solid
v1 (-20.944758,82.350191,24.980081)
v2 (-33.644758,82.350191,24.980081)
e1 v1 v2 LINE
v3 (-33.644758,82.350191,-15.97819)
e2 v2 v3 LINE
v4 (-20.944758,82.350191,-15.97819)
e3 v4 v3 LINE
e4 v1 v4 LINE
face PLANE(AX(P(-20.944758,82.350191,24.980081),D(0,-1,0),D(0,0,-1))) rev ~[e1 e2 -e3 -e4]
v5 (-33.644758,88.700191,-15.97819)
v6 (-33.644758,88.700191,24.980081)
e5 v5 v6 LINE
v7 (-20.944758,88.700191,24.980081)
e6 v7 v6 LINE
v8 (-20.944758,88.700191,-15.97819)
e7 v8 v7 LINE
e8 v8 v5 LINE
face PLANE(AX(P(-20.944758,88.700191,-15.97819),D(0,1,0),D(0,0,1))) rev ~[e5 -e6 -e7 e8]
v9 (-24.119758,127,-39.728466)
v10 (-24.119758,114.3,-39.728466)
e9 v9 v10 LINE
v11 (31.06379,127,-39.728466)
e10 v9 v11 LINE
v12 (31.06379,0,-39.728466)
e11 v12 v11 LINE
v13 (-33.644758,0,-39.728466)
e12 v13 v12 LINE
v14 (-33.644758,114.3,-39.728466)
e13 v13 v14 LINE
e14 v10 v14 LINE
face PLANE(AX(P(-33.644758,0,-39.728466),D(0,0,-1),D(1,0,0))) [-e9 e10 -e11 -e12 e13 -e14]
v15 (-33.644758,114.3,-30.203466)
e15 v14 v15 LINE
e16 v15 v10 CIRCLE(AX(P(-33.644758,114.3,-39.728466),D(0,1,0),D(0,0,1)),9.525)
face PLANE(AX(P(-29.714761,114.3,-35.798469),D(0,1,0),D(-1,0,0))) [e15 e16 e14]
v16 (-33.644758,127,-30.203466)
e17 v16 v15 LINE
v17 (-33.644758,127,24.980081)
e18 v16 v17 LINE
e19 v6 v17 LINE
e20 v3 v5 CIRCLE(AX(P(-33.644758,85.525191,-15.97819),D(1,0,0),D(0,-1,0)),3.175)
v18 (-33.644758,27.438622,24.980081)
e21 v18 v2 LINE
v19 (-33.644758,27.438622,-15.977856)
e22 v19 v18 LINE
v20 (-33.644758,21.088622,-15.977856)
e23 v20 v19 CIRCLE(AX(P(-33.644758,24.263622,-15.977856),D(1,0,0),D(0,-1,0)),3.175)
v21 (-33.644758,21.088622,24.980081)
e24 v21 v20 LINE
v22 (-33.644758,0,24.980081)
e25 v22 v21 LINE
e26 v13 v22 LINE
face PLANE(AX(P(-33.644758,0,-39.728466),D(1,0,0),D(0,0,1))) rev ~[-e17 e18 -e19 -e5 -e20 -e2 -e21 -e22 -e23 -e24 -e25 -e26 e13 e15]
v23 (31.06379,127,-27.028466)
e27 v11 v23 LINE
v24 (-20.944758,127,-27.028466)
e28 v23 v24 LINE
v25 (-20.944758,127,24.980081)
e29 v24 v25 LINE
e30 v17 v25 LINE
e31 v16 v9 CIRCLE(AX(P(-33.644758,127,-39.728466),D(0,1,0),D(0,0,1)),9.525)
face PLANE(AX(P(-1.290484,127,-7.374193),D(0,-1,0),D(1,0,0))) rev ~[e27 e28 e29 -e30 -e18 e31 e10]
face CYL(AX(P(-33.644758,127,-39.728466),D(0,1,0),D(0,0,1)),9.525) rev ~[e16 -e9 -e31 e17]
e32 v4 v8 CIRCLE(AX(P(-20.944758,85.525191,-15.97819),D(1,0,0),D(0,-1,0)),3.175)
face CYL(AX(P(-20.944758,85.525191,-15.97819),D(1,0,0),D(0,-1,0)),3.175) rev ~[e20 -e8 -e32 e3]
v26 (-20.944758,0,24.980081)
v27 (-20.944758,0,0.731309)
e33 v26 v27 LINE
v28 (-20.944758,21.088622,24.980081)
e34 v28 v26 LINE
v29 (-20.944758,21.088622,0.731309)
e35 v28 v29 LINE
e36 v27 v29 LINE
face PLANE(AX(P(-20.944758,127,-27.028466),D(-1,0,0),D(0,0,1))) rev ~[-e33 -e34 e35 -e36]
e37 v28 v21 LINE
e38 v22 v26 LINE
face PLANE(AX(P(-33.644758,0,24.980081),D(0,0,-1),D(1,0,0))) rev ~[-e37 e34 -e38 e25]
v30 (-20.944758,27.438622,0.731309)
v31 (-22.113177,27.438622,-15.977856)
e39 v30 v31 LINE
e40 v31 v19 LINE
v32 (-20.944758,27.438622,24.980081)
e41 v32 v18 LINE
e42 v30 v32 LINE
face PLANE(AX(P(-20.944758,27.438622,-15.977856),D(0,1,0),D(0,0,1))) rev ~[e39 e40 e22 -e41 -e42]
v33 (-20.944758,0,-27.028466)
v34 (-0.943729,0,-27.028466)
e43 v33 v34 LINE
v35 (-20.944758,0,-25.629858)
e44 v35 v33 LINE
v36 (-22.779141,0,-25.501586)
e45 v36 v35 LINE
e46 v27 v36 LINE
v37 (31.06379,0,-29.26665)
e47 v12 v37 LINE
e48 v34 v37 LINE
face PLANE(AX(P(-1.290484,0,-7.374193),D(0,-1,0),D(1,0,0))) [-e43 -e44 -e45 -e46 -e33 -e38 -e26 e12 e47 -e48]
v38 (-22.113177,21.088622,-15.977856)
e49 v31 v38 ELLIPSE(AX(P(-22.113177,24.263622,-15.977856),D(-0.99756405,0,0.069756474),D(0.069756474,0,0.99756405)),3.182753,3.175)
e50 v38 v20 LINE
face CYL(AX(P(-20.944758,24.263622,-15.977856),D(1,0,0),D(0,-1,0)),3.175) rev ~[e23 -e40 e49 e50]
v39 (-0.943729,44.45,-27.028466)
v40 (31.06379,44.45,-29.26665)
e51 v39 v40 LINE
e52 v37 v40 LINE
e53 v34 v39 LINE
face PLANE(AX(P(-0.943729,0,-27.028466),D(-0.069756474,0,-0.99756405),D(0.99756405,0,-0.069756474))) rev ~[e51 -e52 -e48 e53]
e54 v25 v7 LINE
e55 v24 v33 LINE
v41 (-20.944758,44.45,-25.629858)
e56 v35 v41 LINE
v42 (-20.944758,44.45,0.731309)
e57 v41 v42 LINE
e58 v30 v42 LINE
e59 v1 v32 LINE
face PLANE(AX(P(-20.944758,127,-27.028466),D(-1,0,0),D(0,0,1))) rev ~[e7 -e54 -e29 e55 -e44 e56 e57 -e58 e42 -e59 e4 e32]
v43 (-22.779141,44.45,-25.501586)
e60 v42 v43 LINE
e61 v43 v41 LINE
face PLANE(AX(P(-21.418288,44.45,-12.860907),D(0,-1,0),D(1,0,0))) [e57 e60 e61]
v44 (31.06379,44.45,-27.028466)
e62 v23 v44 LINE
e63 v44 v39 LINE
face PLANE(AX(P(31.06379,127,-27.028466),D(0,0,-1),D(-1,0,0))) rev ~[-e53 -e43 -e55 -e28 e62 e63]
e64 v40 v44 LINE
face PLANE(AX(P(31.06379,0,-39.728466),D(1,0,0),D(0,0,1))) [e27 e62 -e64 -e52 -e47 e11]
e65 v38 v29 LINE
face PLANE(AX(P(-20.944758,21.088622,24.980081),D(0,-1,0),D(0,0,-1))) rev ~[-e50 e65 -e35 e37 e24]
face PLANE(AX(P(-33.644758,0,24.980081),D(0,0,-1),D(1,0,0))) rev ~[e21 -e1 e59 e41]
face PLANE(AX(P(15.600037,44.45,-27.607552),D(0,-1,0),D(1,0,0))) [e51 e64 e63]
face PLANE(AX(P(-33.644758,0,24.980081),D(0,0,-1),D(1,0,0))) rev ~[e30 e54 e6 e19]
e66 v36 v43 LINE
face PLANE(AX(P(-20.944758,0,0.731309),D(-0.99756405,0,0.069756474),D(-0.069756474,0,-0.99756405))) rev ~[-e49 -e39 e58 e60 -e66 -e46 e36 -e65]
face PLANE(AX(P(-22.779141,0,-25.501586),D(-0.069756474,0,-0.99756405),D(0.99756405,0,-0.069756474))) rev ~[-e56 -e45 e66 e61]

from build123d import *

# Parameters (mm, degrees)
F0_W     = 64.7085476667
F0_H     = 64.7085476667
F1_DEPTH = 127
F2_W     = 52.0085476667
F2_H     = 52.0085476667
F3_DEPTH = 127.001
F5_DEPTH = 44.45
F6_W     = 6.35
F6_H     = 24.2487721393
F7_DEPTH = 12.701
F9_DEPTH = 12.7


# Not quite as in the source:
# - a feature names something its author has since deleted; it is built from what else it names


with BuildPart() as f1:
    # F0 (on Front) → F1 (new body)
    with BuildSketch(Plane.XZ):
        with Locations((-1.2904843315, -7.374192588)):
            Rectangle(F0_W, F0_H)
    extrude(amount=-F1_DEPTH)

    # F2 (on face) → F3 (cut, through all)
    with BuildSketch(Plane(origin=(0, 127, 0), x_dir=(-1, 0, 0), z_dir=(0, 1, 0))):
        with Locations((-5.0595156685, -1.024192588)):
            Rectangle(F2_W, F2_H)
    extrude(amount=-F3_DEPTH, mode=Mode.SUBTRACT)

    # F4 (on face) → F5 (cut)
    with BuildSketch(Plane.XZ):
        Polygon((31.0637895018, -27.0284664214), (-0.9437288021, -27.0284664214), (31.0637895018, -29.2666501498), align=None)
        Polygon((-20.9447581649, -25.6298581929), (-20.9447581649, 0.731309106), (-22.7791408762, -25.5015856572), align=None)
    extrude(amount=-F5_DEPTH, mode=Mode.SUBTRACT)

    # F6 (on face) → F7 (cut, through all)
    with BuildSketch(Plane.YZ.offset(-20.9447581649)):
        with Locations((24.2636220248, 12.8556951756)):
            Rectangle(F6_W, F6_H)
        with BuildLine():
            Line((27.4386220248, -15.9778556544), (27.4386220248, 0.731309106))
            Line((27.4386220248, 0.731309106), (21.0886220248, 0.731309106))
            Line((21.0886220248, 0.731309106), (21.0886220248, -15.9778556544))
            ThreePointArc((21.0886220248, -15.9778556544), (24.2636220248, -19.1528556544), (27.4386220248, -15.9778556544))
        make_face()
        with BuildLine():
            Line((88.7001905876, 24.9800812453), (82.3501905876, 24.9800812453))
            Line((82.3501905876, 24.9800812453), (82.3501905876, -15.9781904151))
            ThreePointArc((82.3501905876, -15.9781904151), (85.5251905876, -19.1531904151), (88.7001905876, -15.9781904151))
            Line((88.7001905876, -15.9781904151), (88.7001905876, 24.9800812453))
        make_face()
    extrude(amount=-F7_DEPTH, mode=Mode.SUBTRACT)

    # F8 (on face) → F9 (cut)
    with BuildSketch(Plane(origin=(0, 127, 0), x_dir=(-1, 0, 0), z_dir=(0, 1, 0))):
        with BuildLine():
            Line((33.6447581649, -39.7284664214), (33.6447581649, -30.2034664214))
            ThreePointArc((33.6447581649, -30.2034664214), (26.9095660741, -32.9932743306), (24.1197581649, -39.7284664214))
            Line((24.1197581649, -39.7284664214), (33.6447581649, -39.7284664214))
        make_face()
    extrude(amount=-F9_DEPTH, mode=Mode.SUBTRACT)


solid = f1.part
